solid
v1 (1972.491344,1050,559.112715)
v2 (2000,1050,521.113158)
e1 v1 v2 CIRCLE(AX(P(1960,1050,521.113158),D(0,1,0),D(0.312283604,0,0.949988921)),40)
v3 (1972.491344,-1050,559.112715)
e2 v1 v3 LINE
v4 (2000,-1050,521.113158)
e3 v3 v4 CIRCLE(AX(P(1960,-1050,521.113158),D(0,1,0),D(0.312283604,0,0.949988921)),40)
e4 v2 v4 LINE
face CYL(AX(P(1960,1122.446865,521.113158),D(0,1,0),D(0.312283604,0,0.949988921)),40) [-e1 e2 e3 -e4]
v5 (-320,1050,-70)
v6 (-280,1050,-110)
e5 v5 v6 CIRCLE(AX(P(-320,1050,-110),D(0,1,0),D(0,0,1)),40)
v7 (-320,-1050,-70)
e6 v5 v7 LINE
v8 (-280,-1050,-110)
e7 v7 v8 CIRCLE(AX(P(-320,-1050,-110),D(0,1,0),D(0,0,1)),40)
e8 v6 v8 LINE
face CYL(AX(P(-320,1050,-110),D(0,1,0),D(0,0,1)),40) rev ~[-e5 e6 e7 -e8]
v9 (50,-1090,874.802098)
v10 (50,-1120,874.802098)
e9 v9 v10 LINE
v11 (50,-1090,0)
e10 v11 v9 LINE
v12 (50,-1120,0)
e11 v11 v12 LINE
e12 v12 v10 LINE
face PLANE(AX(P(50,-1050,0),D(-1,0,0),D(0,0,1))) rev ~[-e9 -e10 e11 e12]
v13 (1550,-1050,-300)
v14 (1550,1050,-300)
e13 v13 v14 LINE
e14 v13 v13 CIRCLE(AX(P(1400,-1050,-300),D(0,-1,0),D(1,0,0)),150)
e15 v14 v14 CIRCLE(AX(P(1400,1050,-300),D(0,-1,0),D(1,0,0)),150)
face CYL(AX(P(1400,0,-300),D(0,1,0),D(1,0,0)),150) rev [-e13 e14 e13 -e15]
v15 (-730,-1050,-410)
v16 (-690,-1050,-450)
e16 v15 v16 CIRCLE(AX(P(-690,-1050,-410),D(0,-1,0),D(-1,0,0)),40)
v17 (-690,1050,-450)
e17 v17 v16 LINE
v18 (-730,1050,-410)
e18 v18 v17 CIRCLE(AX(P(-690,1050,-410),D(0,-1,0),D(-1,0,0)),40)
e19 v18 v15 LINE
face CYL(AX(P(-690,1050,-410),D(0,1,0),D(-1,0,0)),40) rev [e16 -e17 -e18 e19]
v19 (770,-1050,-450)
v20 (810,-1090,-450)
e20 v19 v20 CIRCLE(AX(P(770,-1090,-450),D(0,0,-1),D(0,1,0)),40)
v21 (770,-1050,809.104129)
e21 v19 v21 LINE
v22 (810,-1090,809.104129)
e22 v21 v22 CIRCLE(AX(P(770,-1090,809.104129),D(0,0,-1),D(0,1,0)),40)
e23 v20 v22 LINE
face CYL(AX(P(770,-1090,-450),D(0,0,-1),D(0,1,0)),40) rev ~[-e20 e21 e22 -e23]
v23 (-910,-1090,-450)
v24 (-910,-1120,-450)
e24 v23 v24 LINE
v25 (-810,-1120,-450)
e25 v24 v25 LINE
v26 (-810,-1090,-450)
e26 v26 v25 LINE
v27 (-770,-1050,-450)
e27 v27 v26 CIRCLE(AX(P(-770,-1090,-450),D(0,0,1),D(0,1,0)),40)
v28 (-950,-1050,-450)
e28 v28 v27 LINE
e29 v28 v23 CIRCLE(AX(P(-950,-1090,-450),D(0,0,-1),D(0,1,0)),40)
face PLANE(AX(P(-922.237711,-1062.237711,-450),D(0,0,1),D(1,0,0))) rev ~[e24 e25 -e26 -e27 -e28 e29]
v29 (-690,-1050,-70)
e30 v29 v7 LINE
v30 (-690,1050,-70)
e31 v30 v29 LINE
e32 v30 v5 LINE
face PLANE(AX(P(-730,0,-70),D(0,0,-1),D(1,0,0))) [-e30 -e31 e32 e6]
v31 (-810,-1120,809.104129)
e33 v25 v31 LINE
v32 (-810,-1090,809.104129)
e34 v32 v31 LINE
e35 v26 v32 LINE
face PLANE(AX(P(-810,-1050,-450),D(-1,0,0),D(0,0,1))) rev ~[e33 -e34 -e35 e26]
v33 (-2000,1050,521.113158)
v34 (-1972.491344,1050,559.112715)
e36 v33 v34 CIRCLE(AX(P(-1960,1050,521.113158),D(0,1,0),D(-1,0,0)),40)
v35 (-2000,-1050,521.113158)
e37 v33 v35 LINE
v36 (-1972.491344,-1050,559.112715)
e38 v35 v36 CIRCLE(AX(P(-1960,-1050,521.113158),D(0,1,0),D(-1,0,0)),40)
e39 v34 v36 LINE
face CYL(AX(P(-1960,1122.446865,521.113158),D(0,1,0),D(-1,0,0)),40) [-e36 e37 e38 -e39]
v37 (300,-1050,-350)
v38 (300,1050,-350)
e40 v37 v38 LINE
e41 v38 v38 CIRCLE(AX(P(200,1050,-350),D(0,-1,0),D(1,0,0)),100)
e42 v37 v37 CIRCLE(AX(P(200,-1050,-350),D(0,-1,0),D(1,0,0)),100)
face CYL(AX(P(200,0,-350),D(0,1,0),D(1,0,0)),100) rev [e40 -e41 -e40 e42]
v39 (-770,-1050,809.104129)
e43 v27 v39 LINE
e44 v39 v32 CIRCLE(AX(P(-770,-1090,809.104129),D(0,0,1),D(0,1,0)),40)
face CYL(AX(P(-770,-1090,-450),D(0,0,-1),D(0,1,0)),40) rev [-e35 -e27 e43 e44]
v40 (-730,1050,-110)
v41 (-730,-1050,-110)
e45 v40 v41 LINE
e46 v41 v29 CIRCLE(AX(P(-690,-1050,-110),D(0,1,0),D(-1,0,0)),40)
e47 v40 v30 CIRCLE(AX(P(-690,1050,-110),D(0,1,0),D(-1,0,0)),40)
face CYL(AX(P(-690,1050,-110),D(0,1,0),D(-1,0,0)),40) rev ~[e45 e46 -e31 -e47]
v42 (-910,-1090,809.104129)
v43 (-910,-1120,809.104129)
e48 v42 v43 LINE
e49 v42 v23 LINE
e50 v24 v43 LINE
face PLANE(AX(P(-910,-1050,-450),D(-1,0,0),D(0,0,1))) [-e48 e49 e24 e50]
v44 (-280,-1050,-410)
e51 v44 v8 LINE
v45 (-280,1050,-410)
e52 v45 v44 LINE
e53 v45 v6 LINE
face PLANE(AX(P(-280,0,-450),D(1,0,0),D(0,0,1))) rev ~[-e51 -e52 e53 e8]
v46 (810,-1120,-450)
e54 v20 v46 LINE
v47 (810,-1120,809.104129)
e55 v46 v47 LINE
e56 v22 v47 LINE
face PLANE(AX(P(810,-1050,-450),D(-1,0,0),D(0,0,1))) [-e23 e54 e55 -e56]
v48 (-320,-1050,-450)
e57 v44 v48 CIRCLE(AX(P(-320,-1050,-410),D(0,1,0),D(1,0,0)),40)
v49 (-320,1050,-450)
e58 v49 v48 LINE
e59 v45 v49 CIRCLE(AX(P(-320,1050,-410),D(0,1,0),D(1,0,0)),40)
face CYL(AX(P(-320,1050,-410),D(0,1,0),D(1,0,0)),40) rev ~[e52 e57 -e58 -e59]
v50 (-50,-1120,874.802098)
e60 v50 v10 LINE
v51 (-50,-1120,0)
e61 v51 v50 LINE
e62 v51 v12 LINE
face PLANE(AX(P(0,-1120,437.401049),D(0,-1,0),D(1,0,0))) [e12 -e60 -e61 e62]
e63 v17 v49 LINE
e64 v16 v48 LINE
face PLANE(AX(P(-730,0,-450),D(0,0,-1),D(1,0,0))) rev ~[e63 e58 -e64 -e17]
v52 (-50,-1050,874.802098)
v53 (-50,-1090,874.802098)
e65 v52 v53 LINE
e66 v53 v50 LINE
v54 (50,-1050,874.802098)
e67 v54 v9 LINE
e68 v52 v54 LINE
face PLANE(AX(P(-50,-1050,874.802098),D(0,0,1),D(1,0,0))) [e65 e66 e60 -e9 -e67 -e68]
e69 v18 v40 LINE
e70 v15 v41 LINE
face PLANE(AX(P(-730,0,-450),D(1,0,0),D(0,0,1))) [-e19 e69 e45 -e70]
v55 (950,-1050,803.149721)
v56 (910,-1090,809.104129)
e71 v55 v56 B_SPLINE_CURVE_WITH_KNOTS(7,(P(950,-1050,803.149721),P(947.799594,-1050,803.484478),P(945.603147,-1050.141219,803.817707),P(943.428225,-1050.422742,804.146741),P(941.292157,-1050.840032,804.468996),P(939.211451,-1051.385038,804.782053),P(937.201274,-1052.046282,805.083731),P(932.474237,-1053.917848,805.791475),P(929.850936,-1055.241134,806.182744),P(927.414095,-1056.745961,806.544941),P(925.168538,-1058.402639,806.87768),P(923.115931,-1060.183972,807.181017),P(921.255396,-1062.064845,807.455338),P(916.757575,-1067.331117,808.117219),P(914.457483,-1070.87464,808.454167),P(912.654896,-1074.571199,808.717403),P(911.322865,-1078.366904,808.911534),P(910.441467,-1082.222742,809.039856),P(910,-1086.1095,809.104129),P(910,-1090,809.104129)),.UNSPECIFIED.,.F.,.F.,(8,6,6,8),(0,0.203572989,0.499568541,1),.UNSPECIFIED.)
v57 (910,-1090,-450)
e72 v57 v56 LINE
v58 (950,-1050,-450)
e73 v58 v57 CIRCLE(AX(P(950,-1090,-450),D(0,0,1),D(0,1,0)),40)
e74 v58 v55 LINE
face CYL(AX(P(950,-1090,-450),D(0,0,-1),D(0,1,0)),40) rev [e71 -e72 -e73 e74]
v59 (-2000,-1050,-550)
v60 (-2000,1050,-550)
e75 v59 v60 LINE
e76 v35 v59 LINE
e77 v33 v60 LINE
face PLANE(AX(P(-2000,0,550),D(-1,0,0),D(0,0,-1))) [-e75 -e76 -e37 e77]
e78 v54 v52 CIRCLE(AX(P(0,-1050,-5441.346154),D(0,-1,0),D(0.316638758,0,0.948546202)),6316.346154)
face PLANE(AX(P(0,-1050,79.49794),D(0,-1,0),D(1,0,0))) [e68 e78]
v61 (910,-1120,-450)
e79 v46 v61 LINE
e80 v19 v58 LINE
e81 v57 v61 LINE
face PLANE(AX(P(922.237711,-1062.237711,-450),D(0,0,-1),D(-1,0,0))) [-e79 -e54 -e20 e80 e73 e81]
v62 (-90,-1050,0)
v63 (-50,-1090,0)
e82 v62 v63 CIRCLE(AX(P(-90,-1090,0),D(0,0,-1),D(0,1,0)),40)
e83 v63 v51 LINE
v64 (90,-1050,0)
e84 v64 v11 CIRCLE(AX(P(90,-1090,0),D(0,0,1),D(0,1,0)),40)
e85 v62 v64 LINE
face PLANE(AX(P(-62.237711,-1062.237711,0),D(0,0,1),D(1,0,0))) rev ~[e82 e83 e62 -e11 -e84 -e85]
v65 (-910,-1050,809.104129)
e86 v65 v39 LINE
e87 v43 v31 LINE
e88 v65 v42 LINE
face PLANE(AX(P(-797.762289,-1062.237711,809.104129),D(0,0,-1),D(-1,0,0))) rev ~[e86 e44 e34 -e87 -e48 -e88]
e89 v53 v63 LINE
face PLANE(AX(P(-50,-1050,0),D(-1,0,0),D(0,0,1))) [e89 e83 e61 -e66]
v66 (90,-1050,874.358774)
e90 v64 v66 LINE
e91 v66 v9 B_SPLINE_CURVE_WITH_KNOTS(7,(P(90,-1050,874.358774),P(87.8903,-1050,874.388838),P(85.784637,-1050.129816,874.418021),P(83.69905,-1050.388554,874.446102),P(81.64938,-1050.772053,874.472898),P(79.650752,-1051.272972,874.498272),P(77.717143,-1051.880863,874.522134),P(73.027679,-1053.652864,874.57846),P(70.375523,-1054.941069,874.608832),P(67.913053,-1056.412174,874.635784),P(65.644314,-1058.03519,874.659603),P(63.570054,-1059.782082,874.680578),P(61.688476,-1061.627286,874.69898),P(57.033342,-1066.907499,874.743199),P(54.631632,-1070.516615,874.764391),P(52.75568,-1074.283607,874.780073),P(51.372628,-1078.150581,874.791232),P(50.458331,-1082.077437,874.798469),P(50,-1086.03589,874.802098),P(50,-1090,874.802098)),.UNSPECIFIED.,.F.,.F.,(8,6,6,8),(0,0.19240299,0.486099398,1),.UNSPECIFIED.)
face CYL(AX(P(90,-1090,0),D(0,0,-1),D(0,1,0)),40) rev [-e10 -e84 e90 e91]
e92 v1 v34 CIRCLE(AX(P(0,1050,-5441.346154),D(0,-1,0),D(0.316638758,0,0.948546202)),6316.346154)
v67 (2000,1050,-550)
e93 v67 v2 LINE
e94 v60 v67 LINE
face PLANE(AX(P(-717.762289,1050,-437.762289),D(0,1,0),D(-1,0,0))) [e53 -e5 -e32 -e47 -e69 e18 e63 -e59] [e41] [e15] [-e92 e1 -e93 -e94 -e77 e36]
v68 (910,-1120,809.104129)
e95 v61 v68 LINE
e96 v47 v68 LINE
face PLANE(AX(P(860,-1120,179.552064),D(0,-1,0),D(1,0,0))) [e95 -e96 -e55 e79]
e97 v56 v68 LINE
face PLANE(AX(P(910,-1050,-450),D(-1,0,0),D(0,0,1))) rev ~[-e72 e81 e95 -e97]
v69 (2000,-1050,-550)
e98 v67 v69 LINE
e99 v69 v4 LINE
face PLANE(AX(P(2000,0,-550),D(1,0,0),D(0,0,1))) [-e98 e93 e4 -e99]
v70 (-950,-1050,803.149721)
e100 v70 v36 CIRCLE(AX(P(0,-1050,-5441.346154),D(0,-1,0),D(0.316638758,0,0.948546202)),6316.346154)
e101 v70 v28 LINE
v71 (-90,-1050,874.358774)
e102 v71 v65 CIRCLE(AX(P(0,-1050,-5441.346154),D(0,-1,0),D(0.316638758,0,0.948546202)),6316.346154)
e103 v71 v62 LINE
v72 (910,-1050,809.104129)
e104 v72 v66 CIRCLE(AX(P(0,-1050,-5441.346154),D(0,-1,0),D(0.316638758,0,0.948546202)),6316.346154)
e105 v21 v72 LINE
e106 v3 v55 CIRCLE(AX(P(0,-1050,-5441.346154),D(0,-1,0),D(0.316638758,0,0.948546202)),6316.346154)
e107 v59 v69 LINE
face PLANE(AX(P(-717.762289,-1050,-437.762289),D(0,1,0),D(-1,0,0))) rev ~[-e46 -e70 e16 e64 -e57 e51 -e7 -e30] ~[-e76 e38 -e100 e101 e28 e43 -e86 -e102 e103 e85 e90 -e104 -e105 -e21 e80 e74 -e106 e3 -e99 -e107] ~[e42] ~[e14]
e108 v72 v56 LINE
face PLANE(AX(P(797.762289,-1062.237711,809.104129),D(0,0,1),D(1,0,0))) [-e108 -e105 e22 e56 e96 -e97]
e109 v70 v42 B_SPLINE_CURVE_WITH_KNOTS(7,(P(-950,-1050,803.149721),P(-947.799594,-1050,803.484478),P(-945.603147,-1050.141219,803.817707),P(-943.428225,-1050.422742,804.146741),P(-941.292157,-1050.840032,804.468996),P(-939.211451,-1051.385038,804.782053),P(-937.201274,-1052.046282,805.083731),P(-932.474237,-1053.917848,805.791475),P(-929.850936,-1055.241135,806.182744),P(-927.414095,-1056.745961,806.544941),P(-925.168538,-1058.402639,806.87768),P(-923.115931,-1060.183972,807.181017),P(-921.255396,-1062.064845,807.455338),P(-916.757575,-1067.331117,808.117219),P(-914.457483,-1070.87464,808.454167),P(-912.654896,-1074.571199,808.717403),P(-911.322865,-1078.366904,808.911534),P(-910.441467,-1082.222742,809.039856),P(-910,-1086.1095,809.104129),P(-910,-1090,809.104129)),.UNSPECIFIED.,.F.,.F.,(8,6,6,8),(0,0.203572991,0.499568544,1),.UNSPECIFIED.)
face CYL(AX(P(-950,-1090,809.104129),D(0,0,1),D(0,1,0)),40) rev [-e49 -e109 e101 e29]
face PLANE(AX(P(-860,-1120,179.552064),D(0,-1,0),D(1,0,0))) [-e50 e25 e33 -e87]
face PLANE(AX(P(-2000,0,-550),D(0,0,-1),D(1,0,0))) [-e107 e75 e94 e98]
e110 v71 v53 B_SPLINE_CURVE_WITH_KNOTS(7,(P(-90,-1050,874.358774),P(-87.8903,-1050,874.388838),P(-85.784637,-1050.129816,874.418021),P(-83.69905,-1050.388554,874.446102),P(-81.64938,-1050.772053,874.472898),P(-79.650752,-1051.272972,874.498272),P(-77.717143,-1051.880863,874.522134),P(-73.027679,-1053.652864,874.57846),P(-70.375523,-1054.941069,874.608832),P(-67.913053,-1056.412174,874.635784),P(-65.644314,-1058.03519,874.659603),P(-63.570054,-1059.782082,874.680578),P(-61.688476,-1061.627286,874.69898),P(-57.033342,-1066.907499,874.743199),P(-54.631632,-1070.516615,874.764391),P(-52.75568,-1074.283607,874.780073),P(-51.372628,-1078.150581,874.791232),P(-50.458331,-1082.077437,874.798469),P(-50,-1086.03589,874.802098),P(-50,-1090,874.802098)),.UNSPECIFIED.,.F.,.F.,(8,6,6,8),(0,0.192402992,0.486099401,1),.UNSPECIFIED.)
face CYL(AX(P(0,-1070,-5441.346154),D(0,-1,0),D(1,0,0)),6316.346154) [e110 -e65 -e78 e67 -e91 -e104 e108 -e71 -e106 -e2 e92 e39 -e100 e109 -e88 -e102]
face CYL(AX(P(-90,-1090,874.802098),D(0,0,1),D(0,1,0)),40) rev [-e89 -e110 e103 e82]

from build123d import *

# Parameters (mm, degrees)
F0_W         = 450
F0_H         = 380
F0_R         = 100
F0_R_2       = 150
F1_DEPTH     = 1050
F2_W         = 100
F2_H         = 1259.1041287501
F2_H_2       = 874.8020976761
F3_DEPTH     = 70
F4_T1_DEPTH  = 2100
F4_T3_DEPTH  = 1259.1041287501
F4_T8_DEPTH  = 1259.1041287501
F4_S9_R      = 6316.3461538462
F4_T10_DEPTH = 632
F4_T14_DEPTH = 874.8020976761
F4_S15_R     = 6316.3461538462
F4_T16_DEPTH = 440
F4_T20_DEPTH = 874.8020976761
F4_S21_R     = 6316.3461538462
F4_T22_DEPTH = 440
F4_T26_DEPTH = 1259.1041287501
F4_S27_R     = 6316.3461538462
F4_T28_DEPTH = 632
F4_T29_DEPTH = 2244.8937294243


# Not quite as in the source:
# - a fillet or chamfer that OpenCascade refuses, or shapes differently, is made with other operations: its cross-section is extruded or revolved along the edge and cut away or added


with BuildPart() as f1:
    # F0 (on Front) → F1 (new body, symmetric)
    with BuildSketch(Plane.XZ):
        with BuildLine():
            Line((-2000, -550), (2000, -550))
            Line((2000, -550), (2000, 550))
            ThreePointArc((2000, 550), (0, 875), (-2000, 550))
            Line((-2000, 550), (-2000, -550))
        make_face()
        with Locations((-505, -260)):
            Rectangle(F0_W, F0_H, mode=Mode.SUBTRACT)
        with Locations((200, -350)):
            Circle(F0_R, mode=Mode.SUBTRACT)
        with Locations((1400, -300)):
            Circle(F0_R_2, mode=Mode.SUBTRACT)
    extrude(amount=F1_DEPTH, both=True)

    # F2 (on face) → F3 (join)
    with BuildSketch(Plane.XZ.offset(1050)):
        with Locations((-860, 179.552064375)):
            Rectangle(F2_W, F2_H)
        with Locations((0, 437.401048838)):
            Rectangle(F2_W, F2_H_2)
        with Locations((860, 179.552064375)):
            Rectangle(F2_W, F2_H)
    extrude(amount=F3_DEPTH)

    # F4: fillet of radius 40 on 12 edges, made by hand

    # F4_s2 → F4_t1 (join)
    with BuildSketch(Plane.XZ.offset(-1050)):
        with BuildLine():
            ThreePointArc((-730, -410), (-718.2842712475, -438.2842712475), (-690, -450))
            Line((-690, -450), (-730, -450))
            Line((-730, -450), (-730, -410))
        make_face()
        with BuildLine():
            ThreePointArc((-730, -110), (-718.2842712475, -81.7157287525), (-690, -70))
            Line((-690, -70), (-730, -70))
            Line((-730, -70), (-730, -110))
        make_face()
        with BuildLine():
            ThreePointArc((-280, -410), (-291.7157287525, -438.2842712475), (-320, -450))
            Line((-320, -450), (-280, -450))
            Line((-280, -450), (-280, -410))
        make_face()
        with BuildLine():
            ThreePointArc((-320, -70), (-291.7157287525, -81.7157287525), (-280, -110))
            Line((-280, -110), (-280, -70))
            Line((-280, -70), (-320, -70))
        make_face()
    extrude(amount=F4_T1_DEPTH)

    # F4_s4 → F4_t3 (join)
    with BuildSketch(Plane.XY.offset(-450)):
        with BuildLine():
            ThreePointArc((-770, -1050), (-798.2842712475, -1061.7157287525), (-810, -1090))
            Line((-810, -1090), (-810, -1050))
            Line((-810, -1050), (-770, -1050))
        make_face()
        with BuildLine():
            ThreePointArc((770, -1050), (798.2842712475, -1061.7157287525), (810, -1090))
            Line((810, -1090), (810, -1050))
            Line((810, -1050), (770, -1050))
        make_face()
    extrude(amount=F4_T3_DEPTH)


with BuildPart() as f4_tool6:
    # F4_s7 → F4_t8 (new body)
    with BuildSketch(Plane.XY.offset(-450)):
        with BuildLine():
            ThreePointArc((950, -1050), (921.7157287525, -1061.7157287525), (910, -1090))
            Line((910, -1090), (910, -1050))
            Line((910, -1050), (950, -1050))
        make_face()
    extrude(amount=F4_T8_DEPTH)

    # F4_s9 → F4_t10 (intersect, symmetric)
    with BuildSketch(Plane.XZ.offset(1070)):
        with Locations((0, -5441.3461538462)):
            Circle(F4_S9_R)
    extrude(amount=F4_T10_DEPTH, both=True, mode=Mode.INTERSECT)


with BuildPart() as f1_1:
    add(f1.part)

    # F4_t5: union F4_tool6
    add(f4_tool6.part)


with BuildPart() as f4_tool12:
    # F4_s13 → F4_t14 (new body)
    with BuildSketch(Plane.XY):
        with BuildLine():
            ThreePointArc((90, -1050), (61.7157287525, -1061.7157287525), (50, -1090))
            Line((50, -1090), (50, -1050))
            Line((50, -1050), (90, -1050))
        make_face()
    extrude(amount=F4_T14_DEPTH)

    # F4_s15 → F4_t16 (intersect, symmetric)
    with BuildSketch(Plane.XZ.offset(1070)):
        with Locations((0, -5441.3461538462)):
            Circle(F4_S15_R)
    extrude(amount=F4_T16_DEPTH, both=True, mode=Mode.INTERSECT)


with BuildPart() as f1_2:
    add(f1_1.part)

    # F4_t11: union F4_tool12
    add(f4_tool12.part)


with BuildPart() as f4_tool18:
    # F4_s19 → F4_t20 (new body)
    with BuildSketch(Plane.XY.offset(874.8020976761)):
        with BuildLine():
            ThreePointArc((-90, -1050), (-61.7157287525, -1061.7157287525), (-50, -1090))
            Line((-50, -1090), (-50, -1050))
            Line((-50, -1050), (-90, -1050))
        make_face()
    extrude(amount=-F4_T20_DEPTH)

    # F4_s21 → F4_t22 (intersect, symmetric)
    with BuildSketch(Plane.XZ.offset(1070)):
        with Locations((0, -5441.3461538462)):
            Circle(F4_S21_R)
    extrude(amount=F4_T22_DEPTH, both=True, mode=Mode.INTERSECT)


with BuildPart() as f1_3:
    add(f1_2.part)

    # F4_t17: union F4_tool18
    add(f4_tool18.part)


with BuildPart() as f4_tool24:
    # F4_s25 → F4_t26 (new body)
    with BuildSketch(Plane.XY.offset(809.1041287501)):
        with BuildLine():
            ThreePointArc((-950, -1050), (-921.7157287525, -1061.7157287525), (-910, -1090))
            Line((-910, -1090), (-910, -1050))
            Line((-910, -1050), (-950, -1050))
        make_face()
    extrude(amount=-F4_T26_DEPTH)

    # F4_s27 → F4_t28 (intersect, symmetric)
    with BuildSketch(Plane.XZ.offset(1070)):
        with Locations((0, -5441.3461538462)):
            Circle(F4_S27_R)
    extrude(amount=F4_T28_DEPTH, both=True, mode=Mode.INTERSECT)


with BuildPart() as f1_4:
    add(f1_3.part)

    # F4_t23: union F4_tool24
    add(f4_tool24.part)

    # F4_s30 → F4_t29 (cut)
    with BuildSketch(Plane.XZ.offset(-1122.4468647121)):
        with BuildLine():
            ThreePointArc((1972.4913441799, 559.1127146357), (1992.4010321379, 544.5689271514), (2000, 521.1131577886))
            Line((2000, 521.1131577886), (2000, 550))
            ThreePointArc((2000, 550), (1986.2508981214, 554.5721331987), (1972.4913441799, 559.1127146357))
        make_face()
        with BuildLine():
            ThreePointArc((-2000, 521.1131577886), (-1992.4010321379, 544.5689271514), (-1972.4913441799, 559.1127146357))
            ThreePointArc((-1972.4913441799, 559.1127146357), (-1986.2508981214, 554.5721331987), (-2000, 550))
            Line((-2000, 550), (-2000, 521.1131577886))
        make_face()
    extrude(amount=F4_T29_DEPTH, mode=Mode.SUBTRACT)


solid = f1_4.part
